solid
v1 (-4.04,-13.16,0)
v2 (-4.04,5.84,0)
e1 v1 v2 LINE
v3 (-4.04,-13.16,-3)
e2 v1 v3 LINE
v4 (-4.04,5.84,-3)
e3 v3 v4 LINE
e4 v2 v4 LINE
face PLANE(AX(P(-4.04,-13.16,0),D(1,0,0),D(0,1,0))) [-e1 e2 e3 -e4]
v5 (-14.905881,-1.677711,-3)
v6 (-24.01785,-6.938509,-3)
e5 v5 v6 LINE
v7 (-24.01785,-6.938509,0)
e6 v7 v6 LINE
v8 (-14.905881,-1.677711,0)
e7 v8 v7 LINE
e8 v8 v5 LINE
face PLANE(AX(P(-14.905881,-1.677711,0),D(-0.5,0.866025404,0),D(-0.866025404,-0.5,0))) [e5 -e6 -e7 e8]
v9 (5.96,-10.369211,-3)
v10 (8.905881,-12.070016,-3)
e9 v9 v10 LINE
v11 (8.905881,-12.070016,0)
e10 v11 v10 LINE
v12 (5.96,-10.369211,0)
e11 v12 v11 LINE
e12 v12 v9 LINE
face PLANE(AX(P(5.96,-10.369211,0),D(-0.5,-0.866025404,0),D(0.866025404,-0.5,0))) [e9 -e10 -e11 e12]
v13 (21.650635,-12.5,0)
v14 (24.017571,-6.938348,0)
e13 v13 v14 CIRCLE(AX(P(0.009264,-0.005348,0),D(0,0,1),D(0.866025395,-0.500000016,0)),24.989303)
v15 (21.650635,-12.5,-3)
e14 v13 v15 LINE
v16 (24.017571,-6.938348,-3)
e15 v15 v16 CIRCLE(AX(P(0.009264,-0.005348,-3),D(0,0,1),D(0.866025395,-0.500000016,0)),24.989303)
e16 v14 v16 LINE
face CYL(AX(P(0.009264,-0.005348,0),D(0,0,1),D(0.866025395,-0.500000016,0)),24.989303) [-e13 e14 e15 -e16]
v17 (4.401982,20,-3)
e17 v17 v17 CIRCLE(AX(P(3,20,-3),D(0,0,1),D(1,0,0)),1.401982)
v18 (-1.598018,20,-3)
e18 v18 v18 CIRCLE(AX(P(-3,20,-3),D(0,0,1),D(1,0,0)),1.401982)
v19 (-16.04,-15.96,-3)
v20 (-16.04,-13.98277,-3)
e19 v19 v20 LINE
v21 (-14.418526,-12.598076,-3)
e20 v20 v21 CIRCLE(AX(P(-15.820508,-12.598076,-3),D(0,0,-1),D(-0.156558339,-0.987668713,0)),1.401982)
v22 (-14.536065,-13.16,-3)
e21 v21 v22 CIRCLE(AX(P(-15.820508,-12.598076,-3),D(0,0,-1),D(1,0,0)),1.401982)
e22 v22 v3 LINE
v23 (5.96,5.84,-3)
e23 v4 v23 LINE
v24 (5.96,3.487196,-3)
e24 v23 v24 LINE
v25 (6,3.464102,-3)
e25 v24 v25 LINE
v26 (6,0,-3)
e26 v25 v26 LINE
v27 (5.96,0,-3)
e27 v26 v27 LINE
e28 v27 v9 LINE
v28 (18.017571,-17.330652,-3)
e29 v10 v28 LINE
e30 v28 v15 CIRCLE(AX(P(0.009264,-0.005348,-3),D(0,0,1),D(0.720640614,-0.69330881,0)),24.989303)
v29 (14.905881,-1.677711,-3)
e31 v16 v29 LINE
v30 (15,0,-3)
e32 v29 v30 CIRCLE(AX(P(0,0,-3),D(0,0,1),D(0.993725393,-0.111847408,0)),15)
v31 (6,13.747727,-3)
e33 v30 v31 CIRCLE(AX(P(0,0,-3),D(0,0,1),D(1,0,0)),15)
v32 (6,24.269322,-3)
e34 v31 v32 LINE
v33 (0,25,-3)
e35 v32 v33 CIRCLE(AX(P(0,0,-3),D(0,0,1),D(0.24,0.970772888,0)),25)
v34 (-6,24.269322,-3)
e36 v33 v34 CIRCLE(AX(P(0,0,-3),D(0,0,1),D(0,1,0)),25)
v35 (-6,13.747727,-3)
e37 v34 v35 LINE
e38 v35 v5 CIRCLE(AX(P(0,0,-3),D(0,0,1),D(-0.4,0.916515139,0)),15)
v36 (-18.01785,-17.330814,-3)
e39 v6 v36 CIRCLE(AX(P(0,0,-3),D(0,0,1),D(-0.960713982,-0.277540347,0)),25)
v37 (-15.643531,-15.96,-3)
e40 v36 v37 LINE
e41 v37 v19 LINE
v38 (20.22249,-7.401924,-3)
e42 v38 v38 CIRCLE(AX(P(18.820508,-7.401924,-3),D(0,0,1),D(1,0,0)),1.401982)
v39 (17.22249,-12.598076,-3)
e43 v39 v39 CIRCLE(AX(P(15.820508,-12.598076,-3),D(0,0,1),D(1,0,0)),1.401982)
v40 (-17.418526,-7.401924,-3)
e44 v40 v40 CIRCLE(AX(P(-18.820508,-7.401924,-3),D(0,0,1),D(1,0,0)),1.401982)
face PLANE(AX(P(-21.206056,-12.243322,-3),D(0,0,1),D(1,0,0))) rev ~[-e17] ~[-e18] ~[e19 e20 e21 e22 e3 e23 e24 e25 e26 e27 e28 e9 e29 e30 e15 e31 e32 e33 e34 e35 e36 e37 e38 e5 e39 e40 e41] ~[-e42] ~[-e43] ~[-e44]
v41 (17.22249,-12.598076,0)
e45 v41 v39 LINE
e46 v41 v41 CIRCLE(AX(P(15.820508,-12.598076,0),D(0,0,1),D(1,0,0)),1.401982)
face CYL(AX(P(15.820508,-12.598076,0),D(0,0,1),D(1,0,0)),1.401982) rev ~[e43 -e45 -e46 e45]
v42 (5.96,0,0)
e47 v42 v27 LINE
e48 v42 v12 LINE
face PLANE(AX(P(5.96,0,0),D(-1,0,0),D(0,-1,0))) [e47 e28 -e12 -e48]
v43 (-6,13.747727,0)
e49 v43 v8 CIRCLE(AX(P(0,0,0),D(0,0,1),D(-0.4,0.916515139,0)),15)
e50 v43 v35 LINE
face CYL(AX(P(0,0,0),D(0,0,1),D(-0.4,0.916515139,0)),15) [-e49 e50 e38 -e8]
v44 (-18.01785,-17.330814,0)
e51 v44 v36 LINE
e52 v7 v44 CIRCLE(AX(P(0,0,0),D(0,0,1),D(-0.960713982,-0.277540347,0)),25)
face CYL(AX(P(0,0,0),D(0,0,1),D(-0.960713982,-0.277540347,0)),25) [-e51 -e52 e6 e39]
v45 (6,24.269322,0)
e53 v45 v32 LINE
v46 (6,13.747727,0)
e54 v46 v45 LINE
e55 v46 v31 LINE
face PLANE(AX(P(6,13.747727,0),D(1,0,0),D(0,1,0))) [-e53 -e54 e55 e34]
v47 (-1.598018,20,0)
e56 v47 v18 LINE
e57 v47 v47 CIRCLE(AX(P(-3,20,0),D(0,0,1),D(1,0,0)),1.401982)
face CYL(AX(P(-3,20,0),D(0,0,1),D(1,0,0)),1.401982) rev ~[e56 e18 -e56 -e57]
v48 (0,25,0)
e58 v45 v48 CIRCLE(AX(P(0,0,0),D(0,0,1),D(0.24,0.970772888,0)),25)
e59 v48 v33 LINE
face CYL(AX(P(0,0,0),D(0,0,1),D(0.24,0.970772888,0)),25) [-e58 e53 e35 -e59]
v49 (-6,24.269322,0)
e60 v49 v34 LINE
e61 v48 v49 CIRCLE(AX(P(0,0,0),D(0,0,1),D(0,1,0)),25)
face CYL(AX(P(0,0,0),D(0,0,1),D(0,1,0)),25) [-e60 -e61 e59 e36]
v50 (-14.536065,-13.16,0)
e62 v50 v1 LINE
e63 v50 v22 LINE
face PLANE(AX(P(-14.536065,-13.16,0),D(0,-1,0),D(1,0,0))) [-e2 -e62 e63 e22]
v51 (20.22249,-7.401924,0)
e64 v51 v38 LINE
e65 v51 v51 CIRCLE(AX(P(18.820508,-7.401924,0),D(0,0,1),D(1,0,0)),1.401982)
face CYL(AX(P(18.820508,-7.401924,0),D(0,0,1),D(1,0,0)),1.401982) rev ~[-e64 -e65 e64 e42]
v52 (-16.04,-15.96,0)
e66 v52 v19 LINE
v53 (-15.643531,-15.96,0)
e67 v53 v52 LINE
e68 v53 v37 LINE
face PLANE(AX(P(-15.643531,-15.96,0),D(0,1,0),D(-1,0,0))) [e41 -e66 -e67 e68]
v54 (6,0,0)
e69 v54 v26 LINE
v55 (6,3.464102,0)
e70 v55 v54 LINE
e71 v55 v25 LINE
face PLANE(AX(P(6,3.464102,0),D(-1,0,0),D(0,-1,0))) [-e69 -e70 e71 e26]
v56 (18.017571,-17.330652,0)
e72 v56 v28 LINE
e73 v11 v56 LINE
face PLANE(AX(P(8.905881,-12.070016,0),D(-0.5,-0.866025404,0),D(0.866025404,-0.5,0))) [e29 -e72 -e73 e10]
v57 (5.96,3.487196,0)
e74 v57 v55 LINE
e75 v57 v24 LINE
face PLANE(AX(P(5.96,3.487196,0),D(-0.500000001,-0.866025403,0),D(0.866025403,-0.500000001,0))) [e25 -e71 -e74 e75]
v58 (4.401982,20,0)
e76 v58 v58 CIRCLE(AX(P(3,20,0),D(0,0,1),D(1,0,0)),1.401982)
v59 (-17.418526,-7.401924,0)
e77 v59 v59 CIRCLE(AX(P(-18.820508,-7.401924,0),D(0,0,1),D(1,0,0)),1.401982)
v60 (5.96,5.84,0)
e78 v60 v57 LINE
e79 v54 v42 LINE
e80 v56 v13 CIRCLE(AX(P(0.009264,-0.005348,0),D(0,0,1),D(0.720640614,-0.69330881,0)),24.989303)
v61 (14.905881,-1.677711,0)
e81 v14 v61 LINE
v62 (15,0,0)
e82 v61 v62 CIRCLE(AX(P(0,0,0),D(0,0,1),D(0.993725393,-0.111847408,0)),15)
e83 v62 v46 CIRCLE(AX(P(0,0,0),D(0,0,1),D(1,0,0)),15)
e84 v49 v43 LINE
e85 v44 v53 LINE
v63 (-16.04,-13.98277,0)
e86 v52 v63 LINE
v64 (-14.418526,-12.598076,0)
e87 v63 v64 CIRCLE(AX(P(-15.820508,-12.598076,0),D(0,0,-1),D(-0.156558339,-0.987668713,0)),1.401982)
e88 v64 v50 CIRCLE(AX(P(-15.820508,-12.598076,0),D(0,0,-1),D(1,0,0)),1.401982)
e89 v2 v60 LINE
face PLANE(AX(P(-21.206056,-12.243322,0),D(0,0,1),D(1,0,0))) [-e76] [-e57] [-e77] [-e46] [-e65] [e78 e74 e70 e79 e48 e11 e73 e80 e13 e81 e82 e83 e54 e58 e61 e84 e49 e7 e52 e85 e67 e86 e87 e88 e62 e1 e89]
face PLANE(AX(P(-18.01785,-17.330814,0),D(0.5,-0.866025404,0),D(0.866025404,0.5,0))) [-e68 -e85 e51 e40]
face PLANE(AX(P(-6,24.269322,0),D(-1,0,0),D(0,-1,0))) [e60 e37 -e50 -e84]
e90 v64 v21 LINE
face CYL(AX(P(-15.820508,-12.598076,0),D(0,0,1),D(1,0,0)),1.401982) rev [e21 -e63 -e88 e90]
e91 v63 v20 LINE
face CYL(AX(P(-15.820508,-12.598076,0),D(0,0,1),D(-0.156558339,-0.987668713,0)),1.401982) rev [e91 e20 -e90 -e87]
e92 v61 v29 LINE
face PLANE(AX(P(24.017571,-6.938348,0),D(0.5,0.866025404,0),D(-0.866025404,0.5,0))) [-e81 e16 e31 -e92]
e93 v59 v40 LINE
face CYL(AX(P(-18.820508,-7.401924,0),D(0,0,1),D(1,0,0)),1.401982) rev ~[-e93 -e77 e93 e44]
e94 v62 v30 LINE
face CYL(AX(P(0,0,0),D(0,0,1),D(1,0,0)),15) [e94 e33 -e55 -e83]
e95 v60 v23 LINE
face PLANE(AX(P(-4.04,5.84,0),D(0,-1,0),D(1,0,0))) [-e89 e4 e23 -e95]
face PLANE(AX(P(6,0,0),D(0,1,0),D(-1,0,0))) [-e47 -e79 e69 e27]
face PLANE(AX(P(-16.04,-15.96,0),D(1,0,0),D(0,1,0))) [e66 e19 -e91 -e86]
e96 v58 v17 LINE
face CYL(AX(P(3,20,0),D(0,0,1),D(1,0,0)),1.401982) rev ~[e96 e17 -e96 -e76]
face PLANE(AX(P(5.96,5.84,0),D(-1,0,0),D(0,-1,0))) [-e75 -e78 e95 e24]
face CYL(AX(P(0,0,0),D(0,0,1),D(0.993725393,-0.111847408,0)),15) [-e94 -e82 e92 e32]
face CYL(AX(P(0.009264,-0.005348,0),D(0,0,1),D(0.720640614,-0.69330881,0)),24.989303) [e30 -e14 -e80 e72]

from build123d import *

# Parameters (mm, degrees)
F0_R     = 1.4019816861
F1_DEPTH = 3


with BuildPart() as f1:
    # F0 (on Top) → F1 (new body)
    with BuildSketch(Plane.XY):
        with BuildLine():
            Line((-18.017849557, -17.3308135222), (-24.017849557, -6.9385086768))
            ThreePointArc((-24.017849557, -6.9385086768), (-21.6506350946, -12.5), (-18.017849557, -17.3308135222))
        make_face()
        with BuildLine():
            Line((0, 25), (0, 24.269322199))
            Line((0, 24.269322199), (6, 24.269322199))
            ThreePointArc((6, 24.269322199), (3.0221635482, 24.8166582659), (0, 25))
        make_face()
        with BuildLine():
            Line((-6, 24.269322199), (0, 24.269322199))
            Line((0, 24.269322199), (0, 25))
            ThreePointArc((0, 25), (-3.0221635482, 24.8166582659), (-6, 24.269322199))
        make_face()
        with BuildLine():
            Line((0, 15), (0, 5.84))
            Line((0, 5.84), (5.96, 5.84))
            Line((5.96, 5.84), (5.96, 3.4871956259))
            Line((5.96, 3.4871956259), (6, 3.4641016151))
            Line((6, 3.4641016151), (6, 13.7477270849))
            ThreePointArc((6, 13.7477270849), (3.0646446553, 14.683594694), (0, 15))
        make_face()
        with BuildLine():
            Line((-4.04, 5.84), (0, 5.84))
            Line((0, 5.84), (0, 15))
            ThreePointArc((0, 15), (-3.0646446553, 14.683594694), (-6, 13.7477270849))
            Line((-6, 13.7477270849), (-6, 3.4641016151))
            Line((-6, 3.4641016151), (-14.9058808998, -1.6777111197))
            ThreePointArc((-14.9058808998, -1.6777111197), (-12.9903810568, -7.5), (-8.9058808998, -12.0700159651))
            Line((-8.9058808998, -12.0700159651), (-4.04, -9.2606983178))
            Line((-4.04, -9.2606983178), (-4.04, 0))
            Line((-4.04, 0), (-4.04, 4.5957081427))
            Line((-4.04, 4.5957081427), (-4.04, 5.84))
        make_face()
        with BuildLine():
            ThreePointArc((-6, 13.7477270849), (-3.0646446553, 14.683594694), (0, 15))
            Line((0, 15), (0, 24.269322199))
            Line((0, 24.269322199), (-6, 24.269322199))
            Line((-6, 24.269322199), (-6, 13.7477270849))
        make_face()
        with Locations((-3, 20)):
            Circle(F0_R, mode=Mode.SUBTRACT)
        with BuildLine():
            ThreePointArc((14.9058808998, -1.6777111197), (12.9903810568, -7.5), (8.9058808998, -12.0700159651))
            Line((8.9058808998, -12.0700159651), (18.0175705244, -17.3306524227))
            Line((18.0175705244, -17.3306524227), (24.0175705244, -6.9383475773))
            Line((24.0175705244, -6.9383475773), (14.9058808998, -1.6777111197))
        make_face()
        with Locations((15.8205080757, -12.5980762114)):
            Circle(F0_R, mode=Mode.SUBTRACT)
        with Locations((18.8205080757, -7.4019237886)):
            Circle(F0_R, mode=Mode.SUBTRACT)
        with BuildLine():
            Line((-10.7937886276, -13.16), (-8.9058808998, -12.0700159651))
            ThreePointArc((-8.9058808998, -12.0700159651), (-12.9903810568, -7.5), (-14.9058808998, -1.6777111197))
            Line((-14.9058808998, -1.6777111197), (-24.017849557, -6.9385086768))
            Line((-24.017849557, -6.9385086768), (-18.017849557, -17.3308135222))
            Line((-18.017849557, -17.3308135222), (-15.6435308888, -15.96))
            Line((-15.6435308888, -15.96), (-16.04, -15.96))
            Line((-16.04, -15.96), (-16.04, -13.9827696588))
            ThreePointArc((-16.04, -13.9827696588), (-16.7309554904, -11.5319438776), (-14.4185263896, -12.5980762114))
            ThreePointArc((-14.4185263896, -12.5980762114), (-14.4482255838, -12.8851187355), (-14.5360648874, -13.16))
            Line((-14.5360648874, -13.16), (-10.7937886276, -13.16))
        make_face()
        with Locations((-18.8205080757, -7.4019237886)):
            Circle(F0_R, mode=Mode.SUBTRACT)
        with BuildLine():
            Line((0, 24.269322199), (0, 15))
            ThreePointArc((0, 15), (3.0646446553, 14.683594694), (6, 13.7477270849))
            Line((6, 13.7477270849), (6, 24.269322199))
            Line((6, 24.269322199), (0, 24.269322199))
        make_face()
        with Locations((3, 20)):
            Circle(F0_R, mode=Mode.SUBTRACT)
        with BuildLine():
            Line((6, 0), (5.96, 0))
            Line((5.96, 0), (5.96, -10.3692108346))
            Line((5.96, -10.3692108346), (8.9058808998, -12.0700159651))
            ThreePointArc((8.9058808998, -12.0700159651), (12.9903810568, -7.5), (14.9058808998, -1.6777111197))
            Line((14.9058808998, -1.6777111197), (6, 3.4641016151))
            Line((6, 3.4641016151), (6, 0))
        make_face()
        with BuildLine():
            Line((6, 13.7477270849), (6, 3.4641016151))
            Line((6, 3.4641016151), (14.9058808998, -1.6777111197))
            ThreePointArc((14.9058808998, -1.6777111197), (14.9764517409, -0.8401745364), (15, 0))
            ThreePointArc((15, 0), (12.549900398, 8.2158383626), (6, 13.7477270849))
        make_face()
        with BuildLine():
            Line((-6, 3.4641016151), (-6, 13.7477270849))
            ThreePointArc((-6, 13.7477270849), (-12.9903810568, 7.5), (-14.9058808998, -1.6777111197))
            Line((-14.9058808998, -1.6777111197), (-6, 3.4641016151))
        make_face()
        with BuildLine():
            Line((24.0175705244, -6.9383475773), (18.0175705244, -17.3306524227))
            ThreePointArc((18.0175705244, -17.3306524227), (19.9806943206, -15.025575873), (21.6506348679, -12.5000003926))
            ThreePointArc((21.6506348679, -12.5000003926), (23.0028773953, -9.7910013475), (24.0175705244, -6.9383475773))
        make_face()
        with BuildLine():
            Line((-4.04, -11.16), (-4.04, -9.2606983178))
            Line((-4.04, -9.2606983178), (-8.9058808998, -12.0700159651))
            ThreePointArc((-8.9058808998, -12.0700159651), (-8.0704738939, -12.6438701009), (-7.1982220027, -13.16))
            Line((-7.1982220027, -13.16), (-4.04, -13.16))
            Line((-4.04, -13.16), (-4.04, -11.16))
        make_face()
        with BuildLine():
            ThreePointArc((-7.1982220027, -13.16), (-8.0704738939, -12.6438701009), (-8.9058808998, -12.0700159651))
            Line((-8.9058808998, -12.0700159651), (-10.7937886276, -13.16))
            Line((-10.7937886276, -13.16), (-7.1982220027, -13.16))
        make_face()
    extrude(amount=-F1_DEPTH)


solid = f1.part
